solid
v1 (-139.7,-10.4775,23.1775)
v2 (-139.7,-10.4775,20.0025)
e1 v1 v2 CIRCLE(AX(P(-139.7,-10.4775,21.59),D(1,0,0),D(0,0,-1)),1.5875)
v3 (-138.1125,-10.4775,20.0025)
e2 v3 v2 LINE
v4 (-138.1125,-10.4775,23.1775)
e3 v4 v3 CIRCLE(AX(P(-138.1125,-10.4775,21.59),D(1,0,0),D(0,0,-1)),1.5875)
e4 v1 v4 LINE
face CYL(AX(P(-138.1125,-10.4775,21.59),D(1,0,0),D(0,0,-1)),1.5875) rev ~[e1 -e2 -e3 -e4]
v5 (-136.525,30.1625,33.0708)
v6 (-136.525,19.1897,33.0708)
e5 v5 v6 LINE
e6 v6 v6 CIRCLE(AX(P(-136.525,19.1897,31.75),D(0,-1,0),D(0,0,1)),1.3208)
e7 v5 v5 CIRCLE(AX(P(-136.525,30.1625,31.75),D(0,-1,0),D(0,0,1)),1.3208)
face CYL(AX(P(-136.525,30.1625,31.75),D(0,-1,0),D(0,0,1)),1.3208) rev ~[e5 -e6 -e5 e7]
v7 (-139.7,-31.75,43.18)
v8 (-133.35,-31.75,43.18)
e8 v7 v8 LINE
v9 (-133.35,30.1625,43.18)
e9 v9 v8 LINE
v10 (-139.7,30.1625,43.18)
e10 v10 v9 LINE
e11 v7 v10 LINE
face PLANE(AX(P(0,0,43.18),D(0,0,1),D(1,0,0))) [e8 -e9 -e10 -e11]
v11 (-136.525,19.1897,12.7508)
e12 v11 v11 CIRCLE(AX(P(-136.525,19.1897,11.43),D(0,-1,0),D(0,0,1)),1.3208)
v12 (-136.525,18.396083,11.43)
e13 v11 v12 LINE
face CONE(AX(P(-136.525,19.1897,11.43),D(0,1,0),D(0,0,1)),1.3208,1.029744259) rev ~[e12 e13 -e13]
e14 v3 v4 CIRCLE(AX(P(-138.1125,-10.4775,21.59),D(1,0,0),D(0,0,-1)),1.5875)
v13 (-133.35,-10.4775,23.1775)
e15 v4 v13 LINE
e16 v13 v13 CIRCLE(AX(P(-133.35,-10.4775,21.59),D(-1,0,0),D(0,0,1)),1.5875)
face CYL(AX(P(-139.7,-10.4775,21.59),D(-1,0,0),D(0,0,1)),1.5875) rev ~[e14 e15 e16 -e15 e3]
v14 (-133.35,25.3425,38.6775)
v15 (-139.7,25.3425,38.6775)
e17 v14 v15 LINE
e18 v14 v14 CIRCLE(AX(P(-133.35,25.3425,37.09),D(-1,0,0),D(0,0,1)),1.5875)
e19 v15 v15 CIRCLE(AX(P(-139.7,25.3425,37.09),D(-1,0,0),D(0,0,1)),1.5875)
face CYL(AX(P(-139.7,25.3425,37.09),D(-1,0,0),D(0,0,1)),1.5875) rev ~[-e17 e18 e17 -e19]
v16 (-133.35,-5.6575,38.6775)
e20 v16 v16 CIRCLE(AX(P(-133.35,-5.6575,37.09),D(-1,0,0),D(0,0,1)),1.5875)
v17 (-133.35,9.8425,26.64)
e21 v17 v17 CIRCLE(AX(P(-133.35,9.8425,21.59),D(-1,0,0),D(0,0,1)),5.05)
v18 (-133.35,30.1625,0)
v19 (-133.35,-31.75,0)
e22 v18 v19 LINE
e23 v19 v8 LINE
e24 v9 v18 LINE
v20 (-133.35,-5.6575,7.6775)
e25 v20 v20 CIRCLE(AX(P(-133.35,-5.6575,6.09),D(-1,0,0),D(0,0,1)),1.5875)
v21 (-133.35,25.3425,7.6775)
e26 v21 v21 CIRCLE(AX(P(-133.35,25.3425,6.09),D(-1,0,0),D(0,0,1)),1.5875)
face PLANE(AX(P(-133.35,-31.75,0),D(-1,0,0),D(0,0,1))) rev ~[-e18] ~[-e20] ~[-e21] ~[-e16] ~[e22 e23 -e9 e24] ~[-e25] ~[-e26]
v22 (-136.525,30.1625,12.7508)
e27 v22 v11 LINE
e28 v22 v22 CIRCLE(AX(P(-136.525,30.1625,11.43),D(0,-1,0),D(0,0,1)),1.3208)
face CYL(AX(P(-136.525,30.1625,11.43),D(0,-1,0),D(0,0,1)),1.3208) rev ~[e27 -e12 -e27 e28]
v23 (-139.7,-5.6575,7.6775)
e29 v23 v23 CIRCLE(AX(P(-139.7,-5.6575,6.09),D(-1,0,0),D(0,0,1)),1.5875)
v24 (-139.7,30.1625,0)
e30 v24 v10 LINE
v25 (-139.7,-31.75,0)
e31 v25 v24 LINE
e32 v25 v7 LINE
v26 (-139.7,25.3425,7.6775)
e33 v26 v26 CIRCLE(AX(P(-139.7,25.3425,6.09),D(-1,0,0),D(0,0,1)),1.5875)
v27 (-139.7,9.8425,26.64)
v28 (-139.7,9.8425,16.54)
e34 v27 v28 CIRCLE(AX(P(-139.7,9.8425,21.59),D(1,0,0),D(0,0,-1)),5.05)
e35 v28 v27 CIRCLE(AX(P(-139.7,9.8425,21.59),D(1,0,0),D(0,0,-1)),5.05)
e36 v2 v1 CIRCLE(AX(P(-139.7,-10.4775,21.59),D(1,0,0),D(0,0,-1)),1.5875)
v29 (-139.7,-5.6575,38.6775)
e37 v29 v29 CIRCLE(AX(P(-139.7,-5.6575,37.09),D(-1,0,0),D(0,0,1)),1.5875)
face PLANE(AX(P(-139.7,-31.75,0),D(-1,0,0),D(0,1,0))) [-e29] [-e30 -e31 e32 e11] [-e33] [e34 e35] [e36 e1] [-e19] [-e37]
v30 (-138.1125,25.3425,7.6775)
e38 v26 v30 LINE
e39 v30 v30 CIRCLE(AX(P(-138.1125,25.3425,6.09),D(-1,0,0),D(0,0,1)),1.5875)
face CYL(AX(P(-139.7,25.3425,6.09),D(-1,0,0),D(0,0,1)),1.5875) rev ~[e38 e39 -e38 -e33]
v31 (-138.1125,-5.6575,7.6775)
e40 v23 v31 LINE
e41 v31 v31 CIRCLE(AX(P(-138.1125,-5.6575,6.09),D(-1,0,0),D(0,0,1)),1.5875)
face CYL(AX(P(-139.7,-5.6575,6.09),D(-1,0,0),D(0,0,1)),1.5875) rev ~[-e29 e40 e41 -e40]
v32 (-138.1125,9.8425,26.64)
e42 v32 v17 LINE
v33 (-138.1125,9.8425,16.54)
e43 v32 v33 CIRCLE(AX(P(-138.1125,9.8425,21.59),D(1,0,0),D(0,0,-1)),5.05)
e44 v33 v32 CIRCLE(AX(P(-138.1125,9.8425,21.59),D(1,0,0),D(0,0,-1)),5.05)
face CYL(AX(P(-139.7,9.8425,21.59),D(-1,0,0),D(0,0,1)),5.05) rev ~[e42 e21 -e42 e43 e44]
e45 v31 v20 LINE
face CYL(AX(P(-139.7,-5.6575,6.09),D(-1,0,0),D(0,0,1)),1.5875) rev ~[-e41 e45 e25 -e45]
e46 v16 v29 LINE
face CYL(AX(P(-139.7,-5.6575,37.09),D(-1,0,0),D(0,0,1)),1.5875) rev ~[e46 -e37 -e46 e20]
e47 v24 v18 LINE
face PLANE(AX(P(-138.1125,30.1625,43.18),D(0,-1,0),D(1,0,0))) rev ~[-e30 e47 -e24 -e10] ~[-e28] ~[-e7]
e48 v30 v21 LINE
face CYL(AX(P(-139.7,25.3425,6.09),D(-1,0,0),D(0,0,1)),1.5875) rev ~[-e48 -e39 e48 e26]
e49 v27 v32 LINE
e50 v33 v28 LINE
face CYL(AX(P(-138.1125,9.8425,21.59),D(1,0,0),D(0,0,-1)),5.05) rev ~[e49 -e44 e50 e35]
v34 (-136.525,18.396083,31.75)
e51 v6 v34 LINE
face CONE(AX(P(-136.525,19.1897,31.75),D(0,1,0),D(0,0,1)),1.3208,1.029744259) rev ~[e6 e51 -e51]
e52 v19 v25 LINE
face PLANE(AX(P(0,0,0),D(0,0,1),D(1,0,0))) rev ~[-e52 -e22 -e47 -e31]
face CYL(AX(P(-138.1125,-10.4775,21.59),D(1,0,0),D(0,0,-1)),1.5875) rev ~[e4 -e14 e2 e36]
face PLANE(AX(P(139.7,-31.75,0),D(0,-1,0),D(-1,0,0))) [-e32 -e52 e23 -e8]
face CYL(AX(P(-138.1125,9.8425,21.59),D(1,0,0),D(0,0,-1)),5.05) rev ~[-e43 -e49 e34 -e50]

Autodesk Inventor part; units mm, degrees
ref_plane "YZ Plane" through (0, 0, 0) normal (1, 0, 0) x (0, 1, 0)
ref_plane "XZ Plane" through (0, 0, 0) normal (0, 1, 0) x (-1, 0, 0)
ref_plane "XY Plane" through (0, 0, 0) normal (0, 0, 1) x (1, 0, 0)
sketch "Sketch1" plane through (0, 0, 0) normal (0, 0, 1) x (1, 0, 0)
  line L0 (-139.7, 31.75) -> (139.7, 31.75)
  line L1 (139.7, 31.75) -> (139.7, -31.75)
  line L2 (139.7, -31.75) -> (-139.7, -31.75)
  line L3 (-139.7, -31.75) -> (-139.7, 31.75)
  point P0 (0, 0)
  point P1 (0, 31.75)
  point P2 (139.7, 0)
  dimension "d0" = 279.4
  dimension "d1" = 63.5
extrude "Extrusion1" add sketch "Sketch1" along normal blind 43.18
sketch "Sketch2" plane through (0, 0, 43.18) normal (0, 0, 1) x (1, 0, 0)
  line L0 (-139.7, -31.75) -> (139.7, -31.75) projected
  line L1 (-138.1125, 30.1625) -> (138.1125, 30.1625)
  line L2 (138.1125, 30.1625) -> (138.1125, -31.75)
  line L3 (138.1125, -31.75) -> (-138.1125, -31.75)
  line L4 (-138.1125, -31.75) -> (-138.1125, 30.1625)
  line L5 (139.7, -31.75) -> (139.7, 31.75) projected
  line L6 (139.7, 31.75) -> (-139.7, 31.75) projected
  line L7 (-139.7, 31.75) -> (-139.7, -31.75) projected
  point P0 (0, 0)
  point P1 (-138.1125, -31.75)
  dimension "d4" = 1.5875
  dimension "d5" = 1.5875
  dimension "d6" = 1.5875
extrude "Extrusion2" cut sketch "Sketch2" against normal up to surface (43.18 mm away) contours L4 L1 L2 L0
sketch "Sketch3" plane through (-138.1125, -31.75, 43.18) normal (1, 0, 0) x (0, 0, -1)
  circle A0 centre (21.59, 41.5925) radius 5.05
  line L0 (0, 61.9125) -> (43.18, 61.9125) projected
  circle A1 centre (21.59, 21.2725) radius 1.5875
  line L1 (43.18, 63.5) -> (0, 63.5) projected
  point P0 (43.18, 31.75)
  point P1 (21.59, 63.5)
  dimension "d9" = 10.1
  dimension "d10" = 20.32
  dimension "d13" = 3.175
  dimension "d15" = 20.32
extrude "Extrusion3" cut sketch "Sketch3" along normal through all both and the other way through all
sketch "Sketch4" plane through (139.7, -31.75, 0) normal (1, 0, 0) x (0, 0, -1)
  circle A0 centre (-10.16, 26.3525) radius 2.3813
  line L0 (0, 63.5) -> (-43.18, 63.5) construction
  line L1 (-21.59, 63.5) -> (-21.59, -3.1611) construction
  line L2 (0, 0) -> (0, 63.5) projected
  circle A1 centre (-21.59, 41.5925) radius 5.05 projected
  circle A2 centre (-33.02, 26.3525) radius 2.3813
  point P0 (0, 31.75)
  dimension "d16" = 10.16
  dimension "d17" = 15.24
  dimension "d18" = 4.7625
extrude "Extrusion4" cut sketch "Sketch4" against normal up to surface (1.5875 mm away) contours A0 | A2
sketch "Sketch5" plane through (-139.7, -31.75, 0) normal (-1, 0, 0) x (0, 0, 1)
  circle A0 centre (21.59, 41.5925) radius 5.05 construction
  line L0 (21.59, 41.5925) -> (21.59, 66.4825) construction
  line L1 (21.59, 41.5925) -> (51.2225, 41.5925) construction
  circle A1 centre (37.09, 57.0925) radius 1.5875
  circle A2 centre (6.09, 57.0925) radius 1.5875
  circle A3 centre (37.09, 26.0925) radius 1.5875
  circle A4 centre (6.09, 26.0925) radius 1.5875
  point P0 (0, 31.75)
  dimension "d21" = 3.175
  dimension "d22" = 15.5
  dimension "d23" = 15.5
extrude "Extrusion5" cut sketch "Sketch5" against normal up to surface (1.5875 mm away)
sketch "Sketch6" plane through (0, 0, 43.18) normal (0, 0, 1) x (1, 0, 0)
  line L0 (-138.1125, 30.1625) -> (138.1125, 30.1625) projected
  line L1 (-138.1125, 30.1625) -> (155.4569, 30.1625)
  line L2 (155.4569, 30.1625) -> (155.4569, 53.3555)
  line L3 (155.4569, 53.3555) -> (-138.1125, 53.3555)
  line L4 (-138.1125, 53.3555) -> (-138.1125, 30.1625)
  line L5 (155.4569, 53.3555) -> (81.9347, 53.3555)
  line L6 (81.9347, 53.3555) -> (81.9347, -39.2964)
  line L7 (81.9347, -39.2964) -> (155.4569, -39.2964)
  line L8 (155.4569, -39.2964) -> (155.4569, 53.3555)
  line L9 (-138.1125, 30.1625) -> (-141.389, 30.1625)
  line L10 (-141.389, 30.1625) -> (-141.389, 34.0033)
  line L11 (-141.389, 34.0033) -> (-138.1125, 34.0033)
  line L12 (-138.1125, 34.0033) -> (-138.1125, 30.1625)
  point P0 (0, 0)
  point P1 (81.9347, 30.1625)
extrude "Extrusion6" cut sketch "Sketch6" against normal through all
sketch "Sketch7" plane through (-139.7, -31.75, 0) normal (-1, 0, 0) x (0, 0, 1)
  line L0 (43.18, 61.9125) -> (0, 61.9125) projected
  line L1 (0, 61.9125) -> (0, 0) projected
  line L2 (0, 0) -> (43.18, 0) projected
  line L3 (43.18, 61.9125) -> (43.18, 0) projected
  circle A0 centre (37.09, 26.0925) radius 1.5875 projected
  circle A1 centre (6.09, 57.0925) radius 1.5875 projected
  circle A2 centre (6.09, 26.0925) radius 1.5875 projected
  circle A3 centre (37.09, 57.0925) radius 1.5875 projected
  circle A4 centre (21.59, 41.5925) radius 5.05 projected
  circle A5 centre (21.59, 21.2725) radius 1.5875 projected
  point P0 (0, 31.75)
extrude "Extrusion7" add sketch "Sketch7" against normal blind 6.35
sketch "Sketch8" plane through (-139.7, 30.1625, 43.18) normal (0, 1, 0) x (1, 0, 0)
  line L0 (0, 0) -> (6.35, 0) projected
  line L1 (3.175, 0) -> (3.175, 11.43)
  line L2 (0, 43.18) -> (6.35, 43.18) projected
  line L3 (3.175, 43.18) -> (3.175, 31.75)
  point P0 (139.7, 43.18)
  dimension "d30" = 11.43
  dimension "d31" = 11.43
hole "Hole1" at (-136.525, 30.1625, 31.75) at (-136.525, 30.1625, 11.43) direction (0, -1, 0) diameter 2.6416 depth 10.9728 tip angle 118 thread size "6-32 UNC" class "2B" standard "ANSI Unified Screw Threads"
properties part number "Bracket(left)"
